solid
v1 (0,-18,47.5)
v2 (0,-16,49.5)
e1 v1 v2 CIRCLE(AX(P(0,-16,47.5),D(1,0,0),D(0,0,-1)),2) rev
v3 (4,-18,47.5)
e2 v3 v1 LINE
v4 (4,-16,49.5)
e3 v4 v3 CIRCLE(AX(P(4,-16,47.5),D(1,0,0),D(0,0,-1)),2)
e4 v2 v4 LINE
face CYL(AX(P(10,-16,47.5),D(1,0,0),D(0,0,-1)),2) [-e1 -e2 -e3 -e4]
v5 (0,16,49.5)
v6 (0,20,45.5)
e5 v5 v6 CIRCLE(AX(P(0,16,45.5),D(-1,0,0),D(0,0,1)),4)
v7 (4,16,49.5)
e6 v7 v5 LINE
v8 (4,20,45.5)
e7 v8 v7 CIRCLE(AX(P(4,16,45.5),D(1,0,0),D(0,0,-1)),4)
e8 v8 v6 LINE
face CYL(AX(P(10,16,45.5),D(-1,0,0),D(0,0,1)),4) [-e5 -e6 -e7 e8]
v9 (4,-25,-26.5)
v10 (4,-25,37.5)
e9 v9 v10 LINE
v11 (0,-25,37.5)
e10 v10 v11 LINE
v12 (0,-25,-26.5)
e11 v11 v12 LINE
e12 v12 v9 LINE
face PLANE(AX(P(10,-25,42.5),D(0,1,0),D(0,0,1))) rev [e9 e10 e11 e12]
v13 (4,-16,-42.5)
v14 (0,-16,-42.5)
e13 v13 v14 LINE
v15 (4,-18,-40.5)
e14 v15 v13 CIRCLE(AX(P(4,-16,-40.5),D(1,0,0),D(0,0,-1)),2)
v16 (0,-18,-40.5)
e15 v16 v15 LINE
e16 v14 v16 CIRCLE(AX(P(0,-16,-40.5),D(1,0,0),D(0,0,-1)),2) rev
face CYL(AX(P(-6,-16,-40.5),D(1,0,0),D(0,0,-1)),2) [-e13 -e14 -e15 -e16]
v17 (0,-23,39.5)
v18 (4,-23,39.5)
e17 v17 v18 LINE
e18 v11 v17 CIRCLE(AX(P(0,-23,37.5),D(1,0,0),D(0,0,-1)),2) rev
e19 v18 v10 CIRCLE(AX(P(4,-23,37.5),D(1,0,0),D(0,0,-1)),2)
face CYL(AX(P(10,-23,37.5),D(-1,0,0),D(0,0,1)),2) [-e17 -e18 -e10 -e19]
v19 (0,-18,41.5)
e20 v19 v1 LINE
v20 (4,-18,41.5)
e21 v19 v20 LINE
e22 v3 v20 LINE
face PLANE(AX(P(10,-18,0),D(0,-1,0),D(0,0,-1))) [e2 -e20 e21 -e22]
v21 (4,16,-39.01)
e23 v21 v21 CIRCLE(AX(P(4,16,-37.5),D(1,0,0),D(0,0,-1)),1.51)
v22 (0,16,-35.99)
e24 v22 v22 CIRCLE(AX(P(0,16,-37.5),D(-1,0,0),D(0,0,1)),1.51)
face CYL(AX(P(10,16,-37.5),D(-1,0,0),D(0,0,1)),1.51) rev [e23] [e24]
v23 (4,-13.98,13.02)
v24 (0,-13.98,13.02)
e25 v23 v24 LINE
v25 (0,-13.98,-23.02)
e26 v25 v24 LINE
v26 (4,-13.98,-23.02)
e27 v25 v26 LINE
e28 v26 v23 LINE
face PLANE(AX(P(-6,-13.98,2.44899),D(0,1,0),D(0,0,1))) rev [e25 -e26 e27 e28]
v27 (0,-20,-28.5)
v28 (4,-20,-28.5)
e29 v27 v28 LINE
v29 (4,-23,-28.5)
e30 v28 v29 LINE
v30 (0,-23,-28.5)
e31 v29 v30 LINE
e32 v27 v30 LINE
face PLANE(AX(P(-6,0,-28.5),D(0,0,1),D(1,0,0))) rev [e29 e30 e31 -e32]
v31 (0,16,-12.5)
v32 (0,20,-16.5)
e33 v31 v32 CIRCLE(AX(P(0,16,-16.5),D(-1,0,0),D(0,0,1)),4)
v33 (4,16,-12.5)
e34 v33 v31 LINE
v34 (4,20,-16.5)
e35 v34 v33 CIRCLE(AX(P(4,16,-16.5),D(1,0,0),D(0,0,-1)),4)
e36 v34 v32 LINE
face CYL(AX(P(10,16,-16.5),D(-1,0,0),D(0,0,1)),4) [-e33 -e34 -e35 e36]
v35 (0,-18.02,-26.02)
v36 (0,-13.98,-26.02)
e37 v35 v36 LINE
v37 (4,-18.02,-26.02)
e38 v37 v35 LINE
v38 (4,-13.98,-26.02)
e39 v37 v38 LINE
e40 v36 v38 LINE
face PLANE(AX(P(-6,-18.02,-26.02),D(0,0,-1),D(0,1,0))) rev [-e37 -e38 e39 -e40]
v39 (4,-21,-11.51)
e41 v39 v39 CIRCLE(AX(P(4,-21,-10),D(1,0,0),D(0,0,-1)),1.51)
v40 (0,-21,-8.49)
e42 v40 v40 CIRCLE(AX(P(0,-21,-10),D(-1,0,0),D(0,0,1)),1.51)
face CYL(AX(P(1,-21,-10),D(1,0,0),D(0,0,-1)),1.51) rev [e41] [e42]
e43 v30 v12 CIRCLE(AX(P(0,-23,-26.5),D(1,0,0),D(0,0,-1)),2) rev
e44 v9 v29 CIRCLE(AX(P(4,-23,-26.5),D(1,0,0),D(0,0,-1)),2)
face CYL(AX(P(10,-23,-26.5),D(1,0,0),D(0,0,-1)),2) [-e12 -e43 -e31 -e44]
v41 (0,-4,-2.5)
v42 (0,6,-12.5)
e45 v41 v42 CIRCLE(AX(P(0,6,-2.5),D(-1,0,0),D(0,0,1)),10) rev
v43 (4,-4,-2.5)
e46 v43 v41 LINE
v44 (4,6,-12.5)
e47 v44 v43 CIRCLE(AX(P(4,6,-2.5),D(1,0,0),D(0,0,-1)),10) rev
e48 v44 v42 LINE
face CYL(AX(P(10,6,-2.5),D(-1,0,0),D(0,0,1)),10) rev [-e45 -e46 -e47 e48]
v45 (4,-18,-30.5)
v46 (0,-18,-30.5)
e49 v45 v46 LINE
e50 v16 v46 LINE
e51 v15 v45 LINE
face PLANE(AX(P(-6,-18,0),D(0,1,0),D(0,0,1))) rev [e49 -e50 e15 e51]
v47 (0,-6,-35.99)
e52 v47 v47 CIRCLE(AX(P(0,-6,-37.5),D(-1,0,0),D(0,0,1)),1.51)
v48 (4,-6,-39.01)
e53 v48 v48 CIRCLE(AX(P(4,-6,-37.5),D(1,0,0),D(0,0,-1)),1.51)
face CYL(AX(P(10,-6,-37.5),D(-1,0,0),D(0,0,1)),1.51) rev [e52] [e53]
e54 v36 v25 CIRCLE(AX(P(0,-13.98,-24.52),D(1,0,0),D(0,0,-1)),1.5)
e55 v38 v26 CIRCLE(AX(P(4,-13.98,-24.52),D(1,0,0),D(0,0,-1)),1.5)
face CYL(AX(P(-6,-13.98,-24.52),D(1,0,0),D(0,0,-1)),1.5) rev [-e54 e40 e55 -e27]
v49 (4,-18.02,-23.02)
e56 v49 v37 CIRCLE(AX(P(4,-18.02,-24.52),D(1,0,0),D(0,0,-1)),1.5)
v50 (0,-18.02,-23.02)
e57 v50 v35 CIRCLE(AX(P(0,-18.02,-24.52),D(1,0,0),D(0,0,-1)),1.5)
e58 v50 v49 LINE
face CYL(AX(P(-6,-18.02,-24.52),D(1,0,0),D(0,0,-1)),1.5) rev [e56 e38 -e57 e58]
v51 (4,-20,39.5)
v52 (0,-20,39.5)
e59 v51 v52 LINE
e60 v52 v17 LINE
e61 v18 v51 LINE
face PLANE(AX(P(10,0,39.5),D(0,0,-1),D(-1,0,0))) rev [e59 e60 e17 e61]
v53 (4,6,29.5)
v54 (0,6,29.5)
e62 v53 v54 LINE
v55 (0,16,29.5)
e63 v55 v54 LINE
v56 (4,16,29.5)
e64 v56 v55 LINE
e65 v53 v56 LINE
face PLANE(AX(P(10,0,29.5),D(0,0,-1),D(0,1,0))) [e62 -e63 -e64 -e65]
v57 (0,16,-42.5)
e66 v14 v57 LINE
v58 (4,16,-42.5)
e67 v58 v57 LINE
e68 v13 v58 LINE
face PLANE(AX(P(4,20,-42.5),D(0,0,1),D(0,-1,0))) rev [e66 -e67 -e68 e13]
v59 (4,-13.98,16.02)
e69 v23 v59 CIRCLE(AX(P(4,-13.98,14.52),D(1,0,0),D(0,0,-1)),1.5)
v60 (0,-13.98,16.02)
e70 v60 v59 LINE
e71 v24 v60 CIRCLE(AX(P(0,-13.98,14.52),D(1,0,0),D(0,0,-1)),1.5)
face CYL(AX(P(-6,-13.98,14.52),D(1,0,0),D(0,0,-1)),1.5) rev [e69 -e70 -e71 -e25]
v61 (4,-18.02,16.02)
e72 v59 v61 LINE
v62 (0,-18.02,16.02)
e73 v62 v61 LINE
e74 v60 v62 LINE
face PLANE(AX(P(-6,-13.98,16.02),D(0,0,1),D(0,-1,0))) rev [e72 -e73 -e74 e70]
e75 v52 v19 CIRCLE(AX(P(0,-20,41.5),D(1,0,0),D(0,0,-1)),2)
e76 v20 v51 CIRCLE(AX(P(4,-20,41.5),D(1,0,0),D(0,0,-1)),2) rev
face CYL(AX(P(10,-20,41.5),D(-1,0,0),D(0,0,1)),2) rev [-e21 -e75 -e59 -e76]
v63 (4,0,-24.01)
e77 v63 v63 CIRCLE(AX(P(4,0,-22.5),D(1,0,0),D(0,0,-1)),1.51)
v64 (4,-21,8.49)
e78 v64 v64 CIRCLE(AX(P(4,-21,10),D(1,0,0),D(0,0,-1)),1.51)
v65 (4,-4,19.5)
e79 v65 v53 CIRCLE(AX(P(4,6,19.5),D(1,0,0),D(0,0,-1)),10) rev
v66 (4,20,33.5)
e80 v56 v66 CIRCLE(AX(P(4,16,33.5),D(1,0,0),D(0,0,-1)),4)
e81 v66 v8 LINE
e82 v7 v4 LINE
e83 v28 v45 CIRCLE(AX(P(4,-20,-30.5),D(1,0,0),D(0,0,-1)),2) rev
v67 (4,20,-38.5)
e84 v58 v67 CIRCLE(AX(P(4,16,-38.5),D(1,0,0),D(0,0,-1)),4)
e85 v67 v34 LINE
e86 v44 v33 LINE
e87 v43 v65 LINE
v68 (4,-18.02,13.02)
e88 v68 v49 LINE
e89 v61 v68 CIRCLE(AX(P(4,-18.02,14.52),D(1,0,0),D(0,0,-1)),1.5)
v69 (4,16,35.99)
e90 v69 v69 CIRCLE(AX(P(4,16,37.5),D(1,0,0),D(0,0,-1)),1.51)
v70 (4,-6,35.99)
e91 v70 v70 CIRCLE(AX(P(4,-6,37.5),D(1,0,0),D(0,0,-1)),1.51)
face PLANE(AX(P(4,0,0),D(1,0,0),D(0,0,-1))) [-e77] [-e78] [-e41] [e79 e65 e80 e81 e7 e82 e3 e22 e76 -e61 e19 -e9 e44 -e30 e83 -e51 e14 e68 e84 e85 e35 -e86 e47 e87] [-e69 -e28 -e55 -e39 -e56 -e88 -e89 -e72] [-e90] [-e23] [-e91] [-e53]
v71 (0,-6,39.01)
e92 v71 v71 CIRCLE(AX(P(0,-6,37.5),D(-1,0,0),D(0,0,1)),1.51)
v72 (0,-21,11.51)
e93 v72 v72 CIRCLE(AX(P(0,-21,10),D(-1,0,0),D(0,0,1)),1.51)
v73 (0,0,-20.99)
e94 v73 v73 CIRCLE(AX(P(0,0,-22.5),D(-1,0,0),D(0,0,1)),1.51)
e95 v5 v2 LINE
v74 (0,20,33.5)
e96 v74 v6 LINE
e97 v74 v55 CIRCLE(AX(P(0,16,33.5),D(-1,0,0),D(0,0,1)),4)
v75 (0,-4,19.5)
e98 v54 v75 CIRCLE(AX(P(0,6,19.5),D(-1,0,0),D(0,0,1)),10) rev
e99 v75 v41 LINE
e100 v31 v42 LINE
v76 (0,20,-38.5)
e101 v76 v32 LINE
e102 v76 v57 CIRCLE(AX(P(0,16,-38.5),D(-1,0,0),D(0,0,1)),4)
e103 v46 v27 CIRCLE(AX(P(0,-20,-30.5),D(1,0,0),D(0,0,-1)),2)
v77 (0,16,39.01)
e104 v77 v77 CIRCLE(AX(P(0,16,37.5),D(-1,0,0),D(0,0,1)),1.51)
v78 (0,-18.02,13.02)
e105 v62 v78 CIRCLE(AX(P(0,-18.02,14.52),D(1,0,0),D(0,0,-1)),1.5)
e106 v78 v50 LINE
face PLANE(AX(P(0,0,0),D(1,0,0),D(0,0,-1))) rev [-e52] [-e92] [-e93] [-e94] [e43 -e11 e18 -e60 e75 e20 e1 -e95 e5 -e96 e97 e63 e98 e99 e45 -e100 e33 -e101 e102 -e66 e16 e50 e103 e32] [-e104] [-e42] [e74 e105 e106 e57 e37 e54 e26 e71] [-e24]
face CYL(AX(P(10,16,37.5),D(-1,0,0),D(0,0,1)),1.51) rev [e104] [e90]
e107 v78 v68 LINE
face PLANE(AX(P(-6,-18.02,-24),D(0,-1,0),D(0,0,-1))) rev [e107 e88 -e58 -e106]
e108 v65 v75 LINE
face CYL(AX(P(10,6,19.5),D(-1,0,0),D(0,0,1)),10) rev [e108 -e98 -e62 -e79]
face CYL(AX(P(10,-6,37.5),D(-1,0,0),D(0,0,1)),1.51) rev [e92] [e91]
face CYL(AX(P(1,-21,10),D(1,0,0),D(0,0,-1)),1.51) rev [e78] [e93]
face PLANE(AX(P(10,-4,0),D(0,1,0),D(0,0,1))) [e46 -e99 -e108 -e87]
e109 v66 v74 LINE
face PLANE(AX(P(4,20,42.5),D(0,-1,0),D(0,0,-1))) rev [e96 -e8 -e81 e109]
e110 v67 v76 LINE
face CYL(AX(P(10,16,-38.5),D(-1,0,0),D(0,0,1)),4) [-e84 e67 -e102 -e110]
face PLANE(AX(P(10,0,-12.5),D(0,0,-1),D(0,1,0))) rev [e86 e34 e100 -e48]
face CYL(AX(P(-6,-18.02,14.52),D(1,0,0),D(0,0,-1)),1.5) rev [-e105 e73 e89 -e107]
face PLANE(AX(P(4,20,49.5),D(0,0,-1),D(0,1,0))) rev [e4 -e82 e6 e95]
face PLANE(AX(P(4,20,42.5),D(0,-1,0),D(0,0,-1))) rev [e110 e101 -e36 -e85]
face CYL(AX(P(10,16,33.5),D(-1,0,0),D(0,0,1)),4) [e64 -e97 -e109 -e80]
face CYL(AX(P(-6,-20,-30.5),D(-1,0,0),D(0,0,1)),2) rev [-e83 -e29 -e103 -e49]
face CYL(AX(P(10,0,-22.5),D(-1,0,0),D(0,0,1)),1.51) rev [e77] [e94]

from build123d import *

# Parameters (mm, degrees)
SKETCH_1_W              = 85
SKETCH_1_H              = 40
EXTRUDE_1_DEPTH         = 4
SKETCH_2_R              = 1.51
CUT_EXTRUDE_1_DEPTH     = 10
SKETCH_3_R              = 1.51
CUT_EXTRUDE_2_DEPTH     = 10
SKETCH_5_R              = 1.51
CUT_EXTRUDE_4_DEPTH     = 10
SKETCH_6_W              = 85
SKETCH_6_H              = 25
EXTRUDE_2_DEPTH         = 4
SKETCH_7_R              = 1.51
CUT_EXTRUDE_5_DEPTH     = 3
CUT_EXTRUDE_START       = -3
SKETCH_8_R              = 1.51
CUT_EXTRUDE_6_DEPTH     = 3
CUT_EXTRUDE_7_DEPTH     = 10
SKETCH_10_R             = 1.5
CUT_EXTRUDE_8_DEPTH     = 10
SKETCH_12_OUTSIDE_W     = 108.416
SKETCH_12_OUTSIDE_H     = 88.416
CUT_EXTRUDE_9_DEPTH     = 10
SKETCH_13_W             = 85
SKETCH_13_H             = 20
CUT_EXTRUDE_10_DEPTH    = 10
FILLET_2_R              = 4
MOVE_FACE_1_DEPTH       = 4
MOVE_FACE_2_OUTLINE_R   = 1.51
MOVE_FACE_2_DEPTH       = 4
MOVE_FACE_2_2_OUTLINE_R = 1.51
MOVE_FACE_2_2_DEPTH     = 4
MOVE_FACE_3_OUTLINE_R   = 1.51
MOVE_FACE_3_DEPTH       = 4
MOVE_FACE_3_2_OUTLINE_R = 1.51
MOVE_FACE_3_2_DEPTH     = 4
CUT_EXTRUDE_11_DEPTH    = 10
FILLET_3_R              = 2
CUT_EXTRUDE_12_DEPTH    = 10
FILLET_4_R              = 2


# Read off the part's stored shape, not the designer's step: 移动面1, 移动面2, 移动面3
with BuildPart() as part:
    # 草图1 → 凸台-拉伸1 (new body)
    with BuildSketch(Plane(origin=(0, 0, 0), x_dir=(0, 0, -1), z_dir=(1, 0, 0))):
        Rectangle(SKETCH_1_W, SKETCH_1_H)
    extrude(amount=EXTRUDE_1_DEPTH)

    # 草图2 → 切除-拉伸1 (cut)
    with BuildSketch(Plane.ZY):
        with Locations((-37.5, -11)):
            Circle(SKETCH_2_R)
        with Locations((37.5, -11)):
            Circle(SKETCH_2_R)
        with Locations((37.5, 11)):
            Circle(SKETCH_2_R)
        with Locations((-37.5, 11)):
            Circle(SKETCH_2_R)
    extrude(amount=-CUT_EXTRUDE_1_DEPTH, mode=Mode.SUBTRACT)

    # 草图3 → 切除-拉伸2 (cut)
    with BuildSketch(Plane.ZY):
        with Locations((-2.5, 0)):
            Circle(SKETCH_3_R)
        with Locations((-22.5, 0)):
            Circle(SKETCH_3_R)
    extrude(amount=-CUT_EXTRUDE_2_DEPTH, mode=Mode.SUBTRACT)

    # 草图5 → 切除-拉伸4 (cut)
    with BuildSketch(Plane.ZY):
        with BuildLine():
            Line((29.5, 6), (29.5, 20))
            Line((29.5, 20), (-12.5, 20))
            Line((-12.5, 20), (-12.5, 6))
            ThreePointArc((-12.5, 6), (-9.571067812, -1.071067812), (-2.5, -4))
            Line((-2.5, -4), (19.5, -4))
            ThreePointArc((19.5, -4), (26.571067812, -1.071067812), (29.5, 6))
        make_face()
        with Locations((-2.5, 0)):
            Circle(SKETCH_5_R, mode=Mode.SUBTRACT)
    extrude(amount=-CUT_EXTRUDE_4_DEPTH, mode=Mode.SUBTRACT)

    # 草图6 → 凸台-拉伸2 (add)
    with BuildSketch(Plane.ZY):
        with Locations((0, -32.5)):
            Rectangle(SKETCH_6_W, SKETCH_6_H)
    extrude(amount=-EXTRUDE_2_DEPTH)

    # 草图7 → 切除-拉伸5 (cut)
    with BuildSketch(Plane(origin=(4, 0, 0), x_dir=(0, 0, -1), z_dir=(1, 0, 0))):
        with Locations((-10, -11)):
            Circle(SKETCH_7_R)
        with Locations((10, -11)):
            Circle(SKETCH_7_R)
    extrude(amount=-CUT_EXTRUDE_5_DEPTH, mode=Mode.SUBTRACT)

    # 草图8 → 切除-拉伸6 (cut)
    with BuildSketch(Plane.ZY.offset(CUT_EXTRUDE_START)):
        with Locations(Location((-10, -11, 0), (0, 0, 180))):
            Circle(SKETCH_8_R)
        with Locations(Location((10, -11, 0), (0, 0, 180))):
            Circle(SKETCH_8_R)
    extrude(amount=CUT_EXTRUDE_6_DEPTH, mode=Mode.SUBTRACT)

    # 草图9 → 切除-拉伸7 (cut)
    with BuildSketch(Plane(origin=(4, 0, 0), x_dir=(0, 0, -1), z_dir=(1, 0, 0))):
        Polygon((26, -14), (17.872575328, -14), (-2.448990482, -14), (-16, -14), (-16, -18), (-14, -18), (24, -18), (26, -18), align=None)
    extrude(amount=-CUT_EXTRUDE_7_DEPTH, mode=Mode.SUBTRACT)

    # 草图10 → 切除-拉伸8 (cut)
    with BuildSketch(Plane(origin=(4, 0, 0), x_dir=(0, 0, -1), z_dir=(1, 0, 0))):
        with Locations((24.52, -18.02)):
            Circle(SKETCH_10_R)
        with Locations((-14.52, -18.02)):
            Circle(SKETCH_10_R)
        with Locations((-14.52, -13.98)):
            Circle(SKETCH_10_R)
        with Locations((24.52, -13.98)):
            Circle(SKETCH_10_R)
        Polygon((26.02, -13.98), (17.872575328, -13.98), (-2.448990482, -13.98), (-16.02, -13.98), (-16.02, -18.02), (-14, -18.02), (24, -18.02), (26.02, -18.02), align=None)
    extrude(amount=-CUT_EXTRUDE_8_DEPTH, mode=Mode.SUBTRACT)

    # 草图12 outside → 切除-拉伸9 (cut)
    with BuildSketch(Plane.ZY):
        with Locations((0, -12.5)):
            Rectangle(SKETCH_12_OUTSIDE_W, SKETCH_12_OUTSIDE_H)
        with BuildLine():
            Line((-12.5, 6), (-12.5, 16))
            ThreePointArc((-12.5, 16), (-13.671572875, 18.828427125), (-16.5, 20))
            Line((-16.5, 20), (-38.5, 20))
            ThreePointArc((-38.5, 20), (-41.328427125, 18.828427125), (-42.5, 16))
            Line((-42.5, 16), (-42.5, -45))
            Line((-42.5, -45), (42.5, -45))
            Line((42.5, -45), (42.5, 16))
            ThreePointArc((42.5, 16), (41.328427125, 18.828427125), (38.5, 20))
            Line((38.5, 20), (33.5, 20))
            ThreePointArc((33.5, 20), (30.671572875, 18.828427125), (29.5, 16))
            Line((29.5, 16), (29.5, 6))
            ThreePointArc((29.5, 6), (26.571067812, -1.071067812), (19.5, -4))
            Line((19.5, -4), (-2.5, -4))
            ThreePointArc((-2.5, -4), (-9.571067812, -1.071067812), (-12.5, 6))
        make_face(mode=Mode.SUBTRACT)
    extrude(amount=-CUT_EXTRUDE_9_DEPTH, mode=Mode.SUBTRACT)

    # 草图13 → 切除-拉伸10 (cut)
    with BuildSketch(Plane.ZY):
        with Locations((0, -35)):
            Rectangle(SKETCH_13_W, SKETCH_13_H)
    extrude(amount=-CUT_EXTRUDE_10_DEPTH, mode=Mode.SUBTRACT)

    # 圆角2
    fillet_2_edges = [part.edges().sort_by_distance(p)[0] for p in [
        (2, -25, 42.5),
        (2, -25, -42.5),
    ]]
    fillet(fillet_2_edges, radius=FILLET_2_R)

    # Move Face 1 outline → Move Face 1 (add)
    with BuildSketch(Plane.YZ):
        with BuildLine():
            Line((20, 38.5), (20, 45.5))
            ThreePointArc((20, 45.5), (18.828427125, 48.328427125), (16, 49.5))
            Line((16, 49.5), (-21, 49.5))
            ThreePointArc((-21, 49.5), (-23.828427125, 48.328427125), (-25, 45.5))
            Line((-25, 45.5), (-25, 38.5))
            ThreePointArc((-25, 38.5), (-23.828427125, 41.328427125), (-21, 42.5))
            Line((-21, 42.5), (16, 42.5))
            ThreePointArc((16, 42.5), (18.828427125, 41.328427125), (20, 38.5))
        make_face()
    extrude(amount=MOVE_FACE_1_DEPTH)

    # Move Face 2 outline → Move Face 2 (cut)
    with BuildSketch(Plane.YZ):
        with Locations((-21, -10)):
            Circle(MOVE_FACE_2_OUTLINE_R)
        with Locations((-21, 10)):
            Circle(MOVE_FACE_2_OUTLINE_R)
    extrude(amount=MOVE_FACE_2_DEPTH, mode=Mode.SUBTRACT)

    # Move Face 2 2 outline → Move Face 2 2 (add)
    with BuildSketch(Plane.YZ):
        with Locations((-11, -10)):
            Circle(MOVE_FACE_2_2_OUTLINE_R)
        with Locations((-11, 10)):
            Circle(MOVE_FACE_2_2_OUTLINE_R)
    extrude(amount=MOVE_FACE_2_2_DEPTH)

    # Move Face 3 outline → Move Face 3 (cut)
    with BuildSketch(Plane.YZ):
        with Locations((-6, -37.5)):
            Circle(MOVE_FACE_3_OUTLINE_R)
        with Locations((-6, 37.5)):
            Circle(MOVE_FACE_3_OUTLINE_R)
        with Locations((16, 37.5)):
            Circle(MOVE_FACE_3_OUTLINE_R)
        with Locations((16, -37.5)):
            Circle(MOVE_FACE_3_OUTLINE_R)
    extrude(amount=MOVE_FACE_3_DEPTH, mode=Mode.SUBTRACT)

    # Move Face 3 2 outline → Move Face 3 2 (add)
    with BuildSketch(Plane.YZ):
        with Locations((-11, -37.5)):
            Circle(MOVE_FACE_3_2_OUTLINE_R)
        with Locations((-11, 37.5)):
            Circle(MOVE_FACE_3_2_OUTLINE_R)
        with Locations((11, 37.5)):
            Circle(MOVE_FACE_3_2_OUTLINE_R)
        with Locations((11, -37.5)):
            Circle(MOVE_FACE_3_2_OUTLINE_R)
    extrude(amount=MOVE_FACE_3_2_DEPTH)

    # 草图14 → 切除-拉伸11 (cut)
    with BuildSketch(Plane(origin=(4, 0, 0), x_dir=(0, 0, -1), z_dir=(1, 0, 0))):
        with BuildLine():
            Line((42.5, -21), (42.5, -18))
            Line((42.5, -18), (28.5, -18))
            Line((28.5, -18), (28.5, -25))
            Line((28.5, -25), (38.5, -25))
            ThreePointArc((38.5, -25), (41.328427125, -23.828427125), (42.5, -21))
        make_face()
    extrude(amount=-CUT_EXTRUDE_11_DEPTH, mode=Mode.SUBTRACT)

    # 圆角3
    fillet_3_edges = [part.edges().sort_by_distance(p)[0] for p in [
        (2, -18, -28.5),
        (2, -25, -28.5),
        (2, -18, -42.5),
    ]]
    fillet(fillet_3_edges, radius=FILLET_3_R)

    # 草图16 → 切除-拉伸12 (cut)
    with BuildSketch(Plane.ZY):
        with BuildLine():
            Line((49.5, -18), (39.5, -18))
            Line((39.5, -18), (39.5, -25))
            Line((39.5, -25), (45.5, -25))
            ThreePointArc((45.5, -25), (48.328427125, -23.828427125), (49.5, -21))
            Line((49.5, -21), (49.5, -18))
        make_face()
    extrude(amount=-CUT_EXTRUDE_12_DEPTH, mode=Mode.SUBTRACT)

    # 圆角4
    fillet_4_edges = [part.edges().sort_by_distance(p)[0] for p in [
        (2, -18, 39.5),
        (2, -18, 49.5),
        (2, -25, 39.5),
    ]]
    fillet(fillet_4_edges, radius=FILLET_4_R)


solid = part.part
